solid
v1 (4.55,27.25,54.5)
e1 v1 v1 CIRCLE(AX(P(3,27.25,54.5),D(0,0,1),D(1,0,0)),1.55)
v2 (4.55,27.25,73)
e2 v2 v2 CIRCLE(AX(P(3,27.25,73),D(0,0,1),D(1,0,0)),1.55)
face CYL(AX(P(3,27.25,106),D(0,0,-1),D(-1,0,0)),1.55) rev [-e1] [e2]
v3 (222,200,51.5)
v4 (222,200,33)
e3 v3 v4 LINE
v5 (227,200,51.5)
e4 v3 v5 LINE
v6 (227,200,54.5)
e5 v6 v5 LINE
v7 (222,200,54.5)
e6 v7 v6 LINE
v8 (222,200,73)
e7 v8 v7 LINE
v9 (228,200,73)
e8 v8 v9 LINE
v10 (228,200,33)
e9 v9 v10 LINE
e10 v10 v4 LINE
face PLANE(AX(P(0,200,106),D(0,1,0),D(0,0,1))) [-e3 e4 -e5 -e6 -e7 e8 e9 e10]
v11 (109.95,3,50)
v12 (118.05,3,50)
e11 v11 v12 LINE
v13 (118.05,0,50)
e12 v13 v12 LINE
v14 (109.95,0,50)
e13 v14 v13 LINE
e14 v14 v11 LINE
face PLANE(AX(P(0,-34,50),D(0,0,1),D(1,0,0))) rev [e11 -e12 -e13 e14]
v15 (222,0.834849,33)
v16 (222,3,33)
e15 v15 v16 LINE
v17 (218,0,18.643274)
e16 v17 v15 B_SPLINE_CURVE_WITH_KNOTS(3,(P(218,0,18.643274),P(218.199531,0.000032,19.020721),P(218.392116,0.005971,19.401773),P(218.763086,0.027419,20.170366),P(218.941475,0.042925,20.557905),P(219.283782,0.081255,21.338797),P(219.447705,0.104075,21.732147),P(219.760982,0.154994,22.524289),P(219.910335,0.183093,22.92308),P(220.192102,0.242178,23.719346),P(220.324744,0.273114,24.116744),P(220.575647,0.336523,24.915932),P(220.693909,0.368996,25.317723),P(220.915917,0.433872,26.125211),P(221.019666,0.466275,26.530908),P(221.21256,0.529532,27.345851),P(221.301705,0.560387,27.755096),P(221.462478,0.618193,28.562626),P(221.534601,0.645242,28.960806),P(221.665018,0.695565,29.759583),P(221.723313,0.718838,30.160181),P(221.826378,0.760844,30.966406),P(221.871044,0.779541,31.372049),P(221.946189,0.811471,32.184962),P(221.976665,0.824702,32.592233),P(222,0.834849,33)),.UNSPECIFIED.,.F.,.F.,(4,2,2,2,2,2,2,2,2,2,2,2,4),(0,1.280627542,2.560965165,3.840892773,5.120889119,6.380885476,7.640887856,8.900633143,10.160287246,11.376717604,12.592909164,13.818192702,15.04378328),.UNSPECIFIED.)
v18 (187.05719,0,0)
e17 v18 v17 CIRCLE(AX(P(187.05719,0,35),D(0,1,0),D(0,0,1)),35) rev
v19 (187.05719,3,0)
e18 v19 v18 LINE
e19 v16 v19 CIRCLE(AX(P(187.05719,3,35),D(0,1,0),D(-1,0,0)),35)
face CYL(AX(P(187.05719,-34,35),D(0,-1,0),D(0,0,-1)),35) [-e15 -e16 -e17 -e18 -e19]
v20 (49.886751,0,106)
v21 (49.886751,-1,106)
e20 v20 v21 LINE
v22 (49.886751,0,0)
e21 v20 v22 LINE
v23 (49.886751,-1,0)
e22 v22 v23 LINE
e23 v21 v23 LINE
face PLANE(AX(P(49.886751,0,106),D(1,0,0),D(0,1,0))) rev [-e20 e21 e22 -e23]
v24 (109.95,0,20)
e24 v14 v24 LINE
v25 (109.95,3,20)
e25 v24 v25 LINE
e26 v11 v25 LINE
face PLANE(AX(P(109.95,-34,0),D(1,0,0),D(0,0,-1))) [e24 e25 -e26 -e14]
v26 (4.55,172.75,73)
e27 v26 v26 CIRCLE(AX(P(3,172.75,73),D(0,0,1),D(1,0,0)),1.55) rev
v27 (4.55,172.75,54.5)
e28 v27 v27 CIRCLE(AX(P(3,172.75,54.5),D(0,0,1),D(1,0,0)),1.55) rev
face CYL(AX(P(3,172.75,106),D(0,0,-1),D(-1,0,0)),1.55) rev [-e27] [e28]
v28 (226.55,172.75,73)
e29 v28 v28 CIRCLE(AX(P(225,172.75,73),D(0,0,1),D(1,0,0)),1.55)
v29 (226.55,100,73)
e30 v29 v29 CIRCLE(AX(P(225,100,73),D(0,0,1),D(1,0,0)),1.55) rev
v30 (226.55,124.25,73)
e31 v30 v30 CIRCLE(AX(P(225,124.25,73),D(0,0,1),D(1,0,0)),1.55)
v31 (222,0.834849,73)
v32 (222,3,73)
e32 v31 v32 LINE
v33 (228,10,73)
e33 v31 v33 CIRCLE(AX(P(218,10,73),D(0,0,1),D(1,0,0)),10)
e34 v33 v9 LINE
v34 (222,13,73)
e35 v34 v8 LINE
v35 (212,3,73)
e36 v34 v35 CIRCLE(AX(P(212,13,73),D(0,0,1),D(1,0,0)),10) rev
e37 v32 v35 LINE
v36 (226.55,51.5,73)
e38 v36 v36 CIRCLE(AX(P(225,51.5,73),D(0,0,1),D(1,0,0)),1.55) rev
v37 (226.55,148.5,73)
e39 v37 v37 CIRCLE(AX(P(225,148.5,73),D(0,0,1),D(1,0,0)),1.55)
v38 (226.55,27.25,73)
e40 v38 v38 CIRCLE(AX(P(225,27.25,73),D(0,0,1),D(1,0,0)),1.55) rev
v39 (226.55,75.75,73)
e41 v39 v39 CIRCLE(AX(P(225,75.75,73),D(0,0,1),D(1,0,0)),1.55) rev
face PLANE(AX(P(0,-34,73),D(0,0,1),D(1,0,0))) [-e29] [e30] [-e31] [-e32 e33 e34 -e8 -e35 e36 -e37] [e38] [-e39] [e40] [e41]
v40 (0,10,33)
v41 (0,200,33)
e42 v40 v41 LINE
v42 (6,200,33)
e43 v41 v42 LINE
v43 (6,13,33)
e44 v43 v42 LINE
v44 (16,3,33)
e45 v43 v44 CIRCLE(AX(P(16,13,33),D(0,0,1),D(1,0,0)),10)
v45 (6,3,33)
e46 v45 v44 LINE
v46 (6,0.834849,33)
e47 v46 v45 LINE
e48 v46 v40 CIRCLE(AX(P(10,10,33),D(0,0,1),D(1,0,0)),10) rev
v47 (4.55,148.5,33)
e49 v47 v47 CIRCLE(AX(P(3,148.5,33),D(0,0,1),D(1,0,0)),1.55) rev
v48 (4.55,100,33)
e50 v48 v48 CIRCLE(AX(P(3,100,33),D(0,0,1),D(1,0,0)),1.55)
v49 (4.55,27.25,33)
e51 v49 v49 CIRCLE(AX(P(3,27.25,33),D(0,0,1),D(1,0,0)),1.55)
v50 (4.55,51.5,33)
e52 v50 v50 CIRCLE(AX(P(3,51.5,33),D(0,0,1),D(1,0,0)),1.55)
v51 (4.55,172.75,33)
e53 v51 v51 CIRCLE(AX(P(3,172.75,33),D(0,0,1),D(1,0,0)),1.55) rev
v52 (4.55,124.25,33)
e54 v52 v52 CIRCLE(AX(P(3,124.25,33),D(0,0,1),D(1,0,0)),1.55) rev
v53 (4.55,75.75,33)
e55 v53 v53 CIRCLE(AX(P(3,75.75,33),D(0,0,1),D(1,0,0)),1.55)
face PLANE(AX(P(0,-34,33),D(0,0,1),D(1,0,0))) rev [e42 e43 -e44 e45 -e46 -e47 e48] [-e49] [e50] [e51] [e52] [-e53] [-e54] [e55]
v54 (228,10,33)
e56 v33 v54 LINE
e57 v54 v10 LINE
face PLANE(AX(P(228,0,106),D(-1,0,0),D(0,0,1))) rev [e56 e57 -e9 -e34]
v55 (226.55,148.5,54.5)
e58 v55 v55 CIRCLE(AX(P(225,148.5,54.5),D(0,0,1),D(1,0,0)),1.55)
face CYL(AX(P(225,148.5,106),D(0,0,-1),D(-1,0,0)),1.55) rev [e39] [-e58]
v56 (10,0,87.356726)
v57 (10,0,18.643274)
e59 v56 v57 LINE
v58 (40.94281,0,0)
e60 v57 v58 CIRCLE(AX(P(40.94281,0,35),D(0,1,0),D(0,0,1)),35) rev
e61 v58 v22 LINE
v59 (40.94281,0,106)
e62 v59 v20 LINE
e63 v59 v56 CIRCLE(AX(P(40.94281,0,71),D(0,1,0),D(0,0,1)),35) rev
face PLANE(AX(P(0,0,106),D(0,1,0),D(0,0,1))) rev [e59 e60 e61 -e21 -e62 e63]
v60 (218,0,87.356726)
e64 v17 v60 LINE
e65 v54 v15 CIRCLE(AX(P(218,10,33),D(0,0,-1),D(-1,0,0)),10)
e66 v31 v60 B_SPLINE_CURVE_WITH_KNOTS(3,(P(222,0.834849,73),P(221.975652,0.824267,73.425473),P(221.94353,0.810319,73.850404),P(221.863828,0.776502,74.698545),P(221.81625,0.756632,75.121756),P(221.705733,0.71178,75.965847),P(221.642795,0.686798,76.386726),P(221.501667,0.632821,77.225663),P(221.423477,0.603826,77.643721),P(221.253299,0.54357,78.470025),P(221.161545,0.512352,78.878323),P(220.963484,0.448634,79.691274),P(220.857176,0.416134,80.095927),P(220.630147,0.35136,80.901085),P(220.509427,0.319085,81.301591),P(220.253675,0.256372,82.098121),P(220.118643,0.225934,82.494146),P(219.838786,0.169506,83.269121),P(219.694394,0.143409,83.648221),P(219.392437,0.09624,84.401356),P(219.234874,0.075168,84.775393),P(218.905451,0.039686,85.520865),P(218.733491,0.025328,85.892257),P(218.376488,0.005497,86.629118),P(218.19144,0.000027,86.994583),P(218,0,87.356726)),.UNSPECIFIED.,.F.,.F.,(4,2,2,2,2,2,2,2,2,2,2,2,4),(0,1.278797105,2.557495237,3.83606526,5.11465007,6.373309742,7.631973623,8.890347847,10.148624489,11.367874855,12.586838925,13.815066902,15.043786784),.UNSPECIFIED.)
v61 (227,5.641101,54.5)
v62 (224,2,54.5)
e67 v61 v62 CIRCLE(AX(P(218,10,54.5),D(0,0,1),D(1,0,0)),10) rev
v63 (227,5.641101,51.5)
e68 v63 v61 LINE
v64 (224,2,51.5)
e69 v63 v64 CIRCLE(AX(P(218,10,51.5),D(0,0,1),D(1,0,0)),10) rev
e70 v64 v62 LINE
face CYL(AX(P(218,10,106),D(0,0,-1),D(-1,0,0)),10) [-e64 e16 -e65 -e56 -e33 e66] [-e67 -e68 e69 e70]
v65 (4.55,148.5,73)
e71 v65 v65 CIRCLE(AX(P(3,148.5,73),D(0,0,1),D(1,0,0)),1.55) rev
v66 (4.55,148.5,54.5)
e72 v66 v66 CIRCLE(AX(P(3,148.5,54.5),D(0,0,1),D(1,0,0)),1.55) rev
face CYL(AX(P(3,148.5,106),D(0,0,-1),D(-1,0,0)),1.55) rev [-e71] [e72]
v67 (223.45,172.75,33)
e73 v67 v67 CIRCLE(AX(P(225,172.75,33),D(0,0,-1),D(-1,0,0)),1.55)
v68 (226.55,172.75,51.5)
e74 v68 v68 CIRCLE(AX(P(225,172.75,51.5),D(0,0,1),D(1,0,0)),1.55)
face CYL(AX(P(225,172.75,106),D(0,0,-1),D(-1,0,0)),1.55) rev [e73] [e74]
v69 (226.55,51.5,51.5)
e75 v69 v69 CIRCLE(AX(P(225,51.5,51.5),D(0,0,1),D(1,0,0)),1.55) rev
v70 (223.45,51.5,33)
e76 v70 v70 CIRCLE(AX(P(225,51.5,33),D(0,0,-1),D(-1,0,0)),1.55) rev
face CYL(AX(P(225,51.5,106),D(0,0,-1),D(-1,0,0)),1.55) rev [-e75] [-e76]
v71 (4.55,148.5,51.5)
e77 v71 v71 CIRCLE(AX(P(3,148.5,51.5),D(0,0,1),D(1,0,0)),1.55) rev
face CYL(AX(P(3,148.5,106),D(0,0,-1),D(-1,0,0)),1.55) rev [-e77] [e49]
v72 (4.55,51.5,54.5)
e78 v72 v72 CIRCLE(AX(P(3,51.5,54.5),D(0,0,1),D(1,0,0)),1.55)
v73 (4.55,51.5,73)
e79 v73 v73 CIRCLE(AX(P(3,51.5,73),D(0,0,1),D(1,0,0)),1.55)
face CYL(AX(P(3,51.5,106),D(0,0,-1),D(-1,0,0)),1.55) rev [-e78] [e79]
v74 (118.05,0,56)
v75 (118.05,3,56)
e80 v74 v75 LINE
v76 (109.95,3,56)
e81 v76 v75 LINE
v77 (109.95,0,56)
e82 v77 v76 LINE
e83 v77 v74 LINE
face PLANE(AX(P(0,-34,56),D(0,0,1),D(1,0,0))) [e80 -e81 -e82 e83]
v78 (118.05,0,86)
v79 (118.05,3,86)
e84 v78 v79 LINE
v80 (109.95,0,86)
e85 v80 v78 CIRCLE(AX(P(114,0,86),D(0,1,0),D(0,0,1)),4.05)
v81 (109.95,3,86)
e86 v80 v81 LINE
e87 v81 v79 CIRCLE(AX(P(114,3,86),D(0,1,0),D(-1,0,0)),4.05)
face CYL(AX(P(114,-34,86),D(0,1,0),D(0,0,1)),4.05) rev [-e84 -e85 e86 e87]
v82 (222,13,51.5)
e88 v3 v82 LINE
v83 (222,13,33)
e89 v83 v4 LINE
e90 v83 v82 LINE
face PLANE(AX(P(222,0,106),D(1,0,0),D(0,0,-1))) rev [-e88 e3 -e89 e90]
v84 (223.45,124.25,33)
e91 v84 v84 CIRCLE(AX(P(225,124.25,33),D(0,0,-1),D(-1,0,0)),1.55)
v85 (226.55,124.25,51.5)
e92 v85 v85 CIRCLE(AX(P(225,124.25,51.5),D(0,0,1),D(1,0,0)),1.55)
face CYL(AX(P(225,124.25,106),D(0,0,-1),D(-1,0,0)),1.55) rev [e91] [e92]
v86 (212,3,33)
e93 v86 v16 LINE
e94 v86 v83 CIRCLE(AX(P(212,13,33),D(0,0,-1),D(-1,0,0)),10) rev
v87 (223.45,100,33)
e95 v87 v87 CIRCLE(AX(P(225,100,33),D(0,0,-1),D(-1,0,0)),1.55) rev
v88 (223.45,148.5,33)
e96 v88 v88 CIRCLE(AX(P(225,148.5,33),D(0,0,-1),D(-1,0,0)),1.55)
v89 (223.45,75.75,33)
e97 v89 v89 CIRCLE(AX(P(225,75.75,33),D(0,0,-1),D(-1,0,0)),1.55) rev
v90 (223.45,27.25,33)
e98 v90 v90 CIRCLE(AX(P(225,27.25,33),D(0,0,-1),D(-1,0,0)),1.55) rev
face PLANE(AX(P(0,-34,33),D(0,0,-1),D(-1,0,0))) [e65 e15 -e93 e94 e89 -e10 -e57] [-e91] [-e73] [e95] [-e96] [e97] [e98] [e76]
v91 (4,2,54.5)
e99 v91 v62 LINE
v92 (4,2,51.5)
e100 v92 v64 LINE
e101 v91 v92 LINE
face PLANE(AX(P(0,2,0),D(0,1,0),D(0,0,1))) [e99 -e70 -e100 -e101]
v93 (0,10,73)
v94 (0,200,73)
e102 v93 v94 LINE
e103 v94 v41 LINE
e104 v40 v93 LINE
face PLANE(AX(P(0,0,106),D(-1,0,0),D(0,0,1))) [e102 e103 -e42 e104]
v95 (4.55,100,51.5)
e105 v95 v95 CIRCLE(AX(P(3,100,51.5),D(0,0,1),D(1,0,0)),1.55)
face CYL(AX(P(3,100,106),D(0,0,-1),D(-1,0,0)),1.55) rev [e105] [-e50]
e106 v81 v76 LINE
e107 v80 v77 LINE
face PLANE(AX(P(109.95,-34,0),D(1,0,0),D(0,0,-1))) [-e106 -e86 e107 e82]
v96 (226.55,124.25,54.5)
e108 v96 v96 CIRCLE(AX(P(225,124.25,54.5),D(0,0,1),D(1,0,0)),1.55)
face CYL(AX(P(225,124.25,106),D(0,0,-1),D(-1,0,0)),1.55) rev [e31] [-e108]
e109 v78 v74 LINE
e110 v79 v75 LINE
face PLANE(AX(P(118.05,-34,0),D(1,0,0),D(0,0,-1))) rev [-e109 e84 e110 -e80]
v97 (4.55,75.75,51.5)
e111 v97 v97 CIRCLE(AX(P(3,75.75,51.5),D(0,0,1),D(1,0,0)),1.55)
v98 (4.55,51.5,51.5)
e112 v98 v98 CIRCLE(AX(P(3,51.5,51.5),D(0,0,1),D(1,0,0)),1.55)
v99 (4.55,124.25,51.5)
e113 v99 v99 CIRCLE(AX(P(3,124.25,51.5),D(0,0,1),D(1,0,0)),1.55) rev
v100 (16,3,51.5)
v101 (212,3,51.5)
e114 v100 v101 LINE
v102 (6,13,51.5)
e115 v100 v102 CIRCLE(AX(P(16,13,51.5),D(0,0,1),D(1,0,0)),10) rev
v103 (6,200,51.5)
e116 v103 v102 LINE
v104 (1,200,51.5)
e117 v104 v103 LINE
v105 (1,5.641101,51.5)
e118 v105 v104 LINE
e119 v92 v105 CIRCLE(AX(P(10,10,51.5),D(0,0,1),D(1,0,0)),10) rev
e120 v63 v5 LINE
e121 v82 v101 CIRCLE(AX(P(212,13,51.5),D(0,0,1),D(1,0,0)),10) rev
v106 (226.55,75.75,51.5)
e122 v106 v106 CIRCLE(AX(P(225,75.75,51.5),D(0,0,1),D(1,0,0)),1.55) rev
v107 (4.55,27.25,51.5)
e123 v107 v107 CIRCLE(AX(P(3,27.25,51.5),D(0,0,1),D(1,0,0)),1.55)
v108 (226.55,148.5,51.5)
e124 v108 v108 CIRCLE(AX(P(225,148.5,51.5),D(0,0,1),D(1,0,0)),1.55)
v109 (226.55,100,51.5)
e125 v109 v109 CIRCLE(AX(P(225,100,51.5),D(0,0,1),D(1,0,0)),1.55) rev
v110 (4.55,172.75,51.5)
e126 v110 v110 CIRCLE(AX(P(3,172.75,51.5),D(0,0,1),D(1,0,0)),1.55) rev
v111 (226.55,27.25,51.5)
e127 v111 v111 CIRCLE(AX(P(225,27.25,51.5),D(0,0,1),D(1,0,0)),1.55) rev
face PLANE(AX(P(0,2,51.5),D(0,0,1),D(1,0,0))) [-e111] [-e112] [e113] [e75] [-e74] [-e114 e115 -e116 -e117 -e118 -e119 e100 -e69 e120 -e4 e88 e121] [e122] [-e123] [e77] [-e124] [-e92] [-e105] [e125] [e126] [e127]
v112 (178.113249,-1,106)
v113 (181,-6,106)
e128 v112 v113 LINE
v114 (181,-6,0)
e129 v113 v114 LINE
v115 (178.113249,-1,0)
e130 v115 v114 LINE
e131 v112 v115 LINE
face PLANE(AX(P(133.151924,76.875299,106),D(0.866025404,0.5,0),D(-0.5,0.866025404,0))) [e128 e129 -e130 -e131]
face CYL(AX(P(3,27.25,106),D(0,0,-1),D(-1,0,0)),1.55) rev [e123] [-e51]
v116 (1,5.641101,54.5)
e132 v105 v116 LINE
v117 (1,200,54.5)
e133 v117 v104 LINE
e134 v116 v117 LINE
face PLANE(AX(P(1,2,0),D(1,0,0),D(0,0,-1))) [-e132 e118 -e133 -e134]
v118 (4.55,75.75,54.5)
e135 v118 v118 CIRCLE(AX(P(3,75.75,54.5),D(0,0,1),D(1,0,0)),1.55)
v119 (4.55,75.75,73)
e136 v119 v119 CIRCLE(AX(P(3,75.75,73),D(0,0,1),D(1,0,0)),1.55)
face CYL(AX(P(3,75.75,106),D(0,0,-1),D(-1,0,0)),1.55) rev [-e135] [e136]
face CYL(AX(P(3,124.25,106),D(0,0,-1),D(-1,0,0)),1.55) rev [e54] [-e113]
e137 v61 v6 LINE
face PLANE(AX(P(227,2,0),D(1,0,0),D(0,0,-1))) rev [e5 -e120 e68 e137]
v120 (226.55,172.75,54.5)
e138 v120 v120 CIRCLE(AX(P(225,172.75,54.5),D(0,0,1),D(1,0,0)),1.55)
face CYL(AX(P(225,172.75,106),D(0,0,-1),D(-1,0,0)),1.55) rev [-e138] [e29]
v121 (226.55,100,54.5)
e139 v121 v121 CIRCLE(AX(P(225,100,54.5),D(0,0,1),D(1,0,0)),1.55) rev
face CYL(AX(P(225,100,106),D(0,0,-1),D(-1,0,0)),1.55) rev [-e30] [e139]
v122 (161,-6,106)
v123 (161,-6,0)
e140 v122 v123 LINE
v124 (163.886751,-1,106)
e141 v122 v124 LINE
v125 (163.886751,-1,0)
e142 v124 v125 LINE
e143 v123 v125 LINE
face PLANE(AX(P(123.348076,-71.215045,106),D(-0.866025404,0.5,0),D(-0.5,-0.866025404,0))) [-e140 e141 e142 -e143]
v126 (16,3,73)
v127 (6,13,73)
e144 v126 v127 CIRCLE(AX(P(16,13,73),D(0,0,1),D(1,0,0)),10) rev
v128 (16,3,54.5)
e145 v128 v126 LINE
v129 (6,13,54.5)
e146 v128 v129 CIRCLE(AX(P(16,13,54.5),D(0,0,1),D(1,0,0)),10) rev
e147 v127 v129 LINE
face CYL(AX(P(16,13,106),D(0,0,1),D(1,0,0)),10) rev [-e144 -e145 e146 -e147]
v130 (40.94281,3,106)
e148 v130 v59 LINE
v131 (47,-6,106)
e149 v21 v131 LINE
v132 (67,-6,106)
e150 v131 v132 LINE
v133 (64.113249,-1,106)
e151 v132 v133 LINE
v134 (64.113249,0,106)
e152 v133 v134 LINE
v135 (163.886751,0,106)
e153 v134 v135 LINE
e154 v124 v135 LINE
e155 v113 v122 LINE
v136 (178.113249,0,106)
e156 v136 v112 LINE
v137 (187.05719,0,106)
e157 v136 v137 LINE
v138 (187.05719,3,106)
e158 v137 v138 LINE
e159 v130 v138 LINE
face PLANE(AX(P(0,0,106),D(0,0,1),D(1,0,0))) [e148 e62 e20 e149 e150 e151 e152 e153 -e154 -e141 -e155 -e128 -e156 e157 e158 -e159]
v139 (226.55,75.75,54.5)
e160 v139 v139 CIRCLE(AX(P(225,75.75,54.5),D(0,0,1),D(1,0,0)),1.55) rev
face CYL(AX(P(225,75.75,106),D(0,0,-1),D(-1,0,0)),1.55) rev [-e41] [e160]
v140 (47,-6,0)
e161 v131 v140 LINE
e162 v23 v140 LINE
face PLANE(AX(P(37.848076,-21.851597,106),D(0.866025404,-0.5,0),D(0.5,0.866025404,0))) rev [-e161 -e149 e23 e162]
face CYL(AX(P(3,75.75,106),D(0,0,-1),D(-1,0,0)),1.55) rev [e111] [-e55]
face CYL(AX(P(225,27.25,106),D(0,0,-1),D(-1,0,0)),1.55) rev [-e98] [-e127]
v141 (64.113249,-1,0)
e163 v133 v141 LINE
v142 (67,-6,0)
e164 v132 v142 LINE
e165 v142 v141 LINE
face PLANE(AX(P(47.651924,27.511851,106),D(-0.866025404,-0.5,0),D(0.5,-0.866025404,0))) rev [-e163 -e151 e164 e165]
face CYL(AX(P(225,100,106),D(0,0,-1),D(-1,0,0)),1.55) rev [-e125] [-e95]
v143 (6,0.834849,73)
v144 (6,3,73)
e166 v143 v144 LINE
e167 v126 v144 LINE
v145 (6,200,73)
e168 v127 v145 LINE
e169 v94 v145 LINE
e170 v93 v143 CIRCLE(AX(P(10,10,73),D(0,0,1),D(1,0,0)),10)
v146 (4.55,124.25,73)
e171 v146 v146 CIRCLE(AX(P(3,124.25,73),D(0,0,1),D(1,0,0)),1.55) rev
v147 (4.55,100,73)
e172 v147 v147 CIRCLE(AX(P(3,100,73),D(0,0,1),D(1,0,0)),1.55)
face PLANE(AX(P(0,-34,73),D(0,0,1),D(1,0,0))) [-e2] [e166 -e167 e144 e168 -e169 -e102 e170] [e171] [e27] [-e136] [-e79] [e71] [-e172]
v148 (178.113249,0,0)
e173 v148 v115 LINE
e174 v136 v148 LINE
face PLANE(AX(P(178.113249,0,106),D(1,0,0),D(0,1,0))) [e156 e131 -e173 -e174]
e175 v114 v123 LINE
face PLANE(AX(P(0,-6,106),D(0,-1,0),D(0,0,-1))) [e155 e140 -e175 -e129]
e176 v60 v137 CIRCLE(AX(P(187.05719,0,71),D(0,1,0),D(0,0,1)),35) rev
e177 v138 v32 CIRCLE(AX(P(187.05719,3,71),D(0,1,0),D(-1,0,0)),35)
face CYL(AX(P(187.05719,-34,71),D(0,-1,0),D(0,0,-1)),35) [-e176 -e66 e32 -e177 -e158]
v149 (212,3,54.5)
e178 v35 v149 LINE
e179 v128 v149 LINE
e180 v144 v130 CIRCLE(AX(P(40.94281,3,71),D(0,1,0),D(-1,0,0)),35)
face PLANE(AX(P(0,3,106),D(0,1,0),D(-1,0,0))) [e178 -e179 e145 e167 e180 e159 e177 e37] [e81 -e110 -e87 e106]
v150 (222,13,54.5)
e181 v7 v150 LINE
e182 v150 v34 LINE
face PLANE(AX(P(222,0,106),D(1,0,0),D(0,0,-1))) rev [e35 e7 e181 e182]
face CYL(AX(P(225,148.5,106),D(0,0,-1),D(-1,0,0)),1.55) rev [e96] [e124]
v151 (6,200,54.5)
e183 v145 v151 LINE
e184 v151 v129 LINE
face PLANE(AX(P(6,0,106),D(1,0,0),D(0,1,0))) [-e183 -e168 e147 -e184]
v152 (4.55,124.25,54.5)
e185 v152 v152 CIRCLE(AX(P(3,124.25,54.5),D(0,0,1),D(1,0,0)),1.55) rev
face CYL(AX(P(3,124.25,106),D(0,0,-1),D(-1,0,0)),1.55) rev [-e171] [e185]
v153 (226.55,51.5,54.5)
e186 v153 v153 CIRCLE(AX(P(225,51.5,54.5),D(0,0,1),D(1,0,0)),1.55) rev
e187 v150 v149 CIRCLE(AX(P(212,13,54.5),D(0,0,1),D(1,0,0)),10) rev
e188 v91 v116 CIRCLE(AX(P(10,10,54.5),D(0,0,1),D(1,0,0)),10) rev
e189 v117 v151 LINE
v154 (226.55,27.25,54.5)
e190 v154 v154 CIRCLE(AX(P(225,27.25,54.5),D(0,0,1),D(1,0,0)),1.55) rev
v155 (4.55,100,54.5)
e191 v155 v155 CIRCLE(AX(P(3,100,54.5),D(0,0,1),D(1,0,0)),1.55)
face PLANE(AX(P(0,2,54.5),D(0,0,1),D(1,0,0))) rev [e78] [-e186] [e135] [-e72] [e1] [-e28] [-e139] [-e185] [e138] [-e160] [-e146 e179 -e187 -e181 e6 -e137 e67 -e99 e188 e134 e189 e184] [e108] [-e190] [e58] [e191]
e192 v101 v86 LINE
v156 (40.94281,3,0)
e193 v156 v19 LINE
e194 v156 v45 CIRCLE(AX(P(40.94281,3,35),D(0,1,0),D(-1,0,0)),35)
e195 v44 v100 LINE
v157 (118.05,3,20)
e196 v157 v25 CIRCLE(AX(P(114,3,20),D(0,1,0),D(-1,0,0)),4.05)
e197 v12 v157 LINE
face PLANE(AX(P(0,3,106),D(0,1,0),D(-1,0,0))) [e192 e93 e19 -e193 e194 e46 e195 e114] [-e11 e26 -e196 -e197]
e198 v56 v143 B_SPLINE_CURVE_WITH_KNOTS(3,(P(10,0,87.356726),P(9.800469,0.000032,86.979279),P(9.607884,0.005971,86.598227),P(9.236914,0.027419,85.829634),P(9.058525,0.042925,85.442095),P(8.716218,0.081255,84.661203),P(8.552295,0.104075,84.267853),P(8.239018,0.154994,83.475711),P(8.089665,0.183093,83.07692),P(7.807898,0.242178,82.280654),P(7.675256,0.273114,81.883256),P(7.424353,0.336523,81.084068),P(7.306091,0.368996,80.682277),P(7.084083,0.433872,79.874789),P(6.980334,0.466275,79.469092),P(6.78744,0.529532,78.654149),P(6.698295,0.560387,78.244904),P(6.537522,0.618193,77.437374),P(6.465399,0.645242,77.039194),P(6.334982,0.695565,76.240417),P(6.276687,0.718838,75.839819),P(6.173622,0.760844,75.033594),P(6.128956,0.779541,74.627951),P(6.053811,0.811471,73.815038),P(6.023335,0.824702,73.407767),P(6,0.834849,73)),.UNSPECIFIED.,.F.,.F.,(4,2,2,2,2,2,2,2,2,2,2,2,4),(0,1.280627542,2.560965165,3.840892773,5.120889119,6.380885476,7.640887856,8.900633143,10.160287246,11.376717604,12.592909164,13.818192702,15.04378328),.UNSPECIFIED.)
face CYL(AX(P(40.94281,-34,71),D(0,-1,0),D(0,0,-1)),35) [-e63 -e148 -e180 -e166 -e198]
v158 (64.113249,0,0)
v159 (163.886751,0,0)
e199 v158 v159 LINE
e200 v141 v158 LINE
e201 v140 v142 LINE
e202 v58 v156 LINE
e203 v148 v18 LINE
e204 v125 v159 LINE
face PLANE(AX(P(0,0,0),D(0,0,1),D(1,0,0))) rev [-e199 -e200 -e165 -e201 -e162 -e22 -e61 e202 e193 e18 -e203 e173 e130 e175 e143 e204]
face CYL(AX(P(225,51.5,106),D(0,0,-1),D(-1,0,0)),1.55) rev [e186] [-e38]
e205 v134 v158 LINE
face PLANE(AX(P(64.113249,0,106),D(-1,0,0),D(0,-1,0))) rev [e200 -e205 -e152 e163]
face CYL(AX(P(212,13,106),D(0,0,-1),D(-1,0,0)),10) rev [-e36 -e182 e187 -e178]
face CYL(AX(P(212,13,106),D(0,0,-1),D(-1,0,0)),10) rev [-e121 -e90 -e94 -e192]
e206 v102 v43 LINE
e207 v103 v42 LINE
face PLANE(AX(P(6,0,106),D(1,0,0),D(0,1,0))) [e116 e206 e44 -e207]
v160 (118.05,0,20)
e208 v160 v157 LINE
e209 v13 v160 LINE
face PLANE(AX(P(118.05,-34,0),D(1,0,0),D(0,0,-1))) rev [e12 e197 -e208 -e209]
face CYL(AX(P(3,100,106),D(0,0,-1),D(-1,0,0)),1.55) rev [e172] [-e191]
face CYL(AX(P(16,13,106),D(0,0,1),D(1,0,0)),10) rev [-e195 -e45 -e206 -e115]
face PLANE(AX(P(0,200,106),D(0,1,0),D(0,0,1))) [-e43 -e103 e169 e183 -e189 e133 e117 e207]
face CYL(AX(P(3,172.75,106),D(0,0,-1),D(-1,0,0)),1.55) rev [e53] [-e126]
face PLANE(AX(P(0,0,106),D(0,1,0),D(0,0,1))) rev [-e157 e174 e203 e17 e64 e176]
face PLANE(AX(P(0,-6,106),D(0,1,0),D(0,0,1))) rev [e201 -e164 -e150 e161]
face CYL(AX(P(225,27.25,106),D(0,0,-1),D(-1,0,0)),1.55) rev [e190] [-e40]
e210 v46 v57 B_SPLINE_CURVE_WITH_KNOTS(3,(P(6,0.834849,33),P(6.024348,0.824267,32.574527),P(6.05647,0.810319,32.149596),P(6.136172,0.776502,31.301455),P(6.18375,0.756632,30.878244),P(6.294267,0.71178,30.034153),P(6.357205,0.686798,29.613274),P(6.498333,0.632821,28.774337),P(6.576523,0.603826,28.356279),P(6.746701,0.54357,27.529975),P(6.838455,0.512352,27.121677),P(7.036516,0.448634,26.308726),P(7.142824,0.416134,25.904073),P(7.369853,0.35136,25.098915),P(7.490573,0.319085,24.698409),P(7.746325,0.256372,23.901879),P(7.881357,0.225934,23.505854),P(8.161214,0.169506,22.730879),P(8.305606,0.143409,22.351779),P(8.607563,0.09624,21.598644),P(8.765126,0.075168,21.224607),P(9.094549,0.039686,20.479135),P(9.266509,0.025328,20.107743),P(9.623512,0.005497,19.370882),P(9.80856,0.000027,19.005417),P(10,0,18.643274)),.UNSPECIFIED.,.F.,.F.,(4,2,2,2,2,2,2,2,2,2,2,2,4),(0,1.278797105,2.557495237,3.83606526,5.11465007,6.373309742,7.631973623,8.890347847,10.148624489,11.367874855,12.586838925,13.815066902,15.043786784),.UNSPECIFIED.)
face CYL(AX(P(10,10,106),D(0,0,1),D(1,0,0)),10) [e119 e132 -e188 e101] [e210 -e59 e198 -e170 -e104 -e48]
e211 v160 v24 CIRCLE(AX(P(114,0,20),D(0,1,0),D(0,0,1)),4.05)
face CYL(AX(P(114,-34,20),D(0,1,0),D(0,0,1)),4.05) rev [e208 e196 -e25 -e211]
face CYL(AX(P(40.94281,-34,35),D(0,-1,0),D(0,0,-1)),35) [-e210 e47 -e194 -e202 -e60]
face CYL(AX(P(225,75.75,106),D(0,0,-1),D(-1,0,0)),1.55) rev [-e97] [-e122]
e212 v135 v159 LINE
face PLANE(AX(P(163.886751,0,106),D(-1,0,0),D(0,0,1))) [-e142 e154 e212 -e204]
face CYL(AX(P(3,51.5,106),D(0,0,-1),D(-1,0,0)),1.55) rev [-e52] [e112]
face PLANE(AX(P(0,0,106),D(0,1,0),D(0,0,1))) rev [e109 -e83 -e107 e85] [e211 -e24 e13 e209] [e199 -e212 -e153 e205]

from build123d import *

# Parameters (mm, degrees)
SKETCH1_W           = 6
SKETCH1_H           = 197
SKETCH1_R           = 1.55
SKETCH1_H_2         = 3
BOSS_EXTRUDE1_DEPTH = 106
SKETCH2_W           = 6
SKETCH2_H           = 33
CUT_EXTRUDE1_DEPTH  = 234
FILLET2_R           = 10
SKETCH2_5_W         = 5
SKETCH2_5_H         = 3
SKETCH2_5_W_2       = 103.95
SKETCH2_5_W_3       = 8.1
CUT_EXTRUDE2_DEPTH  = 198
FILLET1_R           = 35


with BuildPart() as part:
    # Sketch1 → Boss-Extrude1 (new body)
    # profile 1 of 7: a face of its own
    with BuildSketch(Plane.XY):
        with Locations((225, 101.5)):
            Rectangle(SKETCH1_W, SKETCH1_H)
        with Locations((225, 27.25)):
            Circle(SKETCH1_R, mode=Mode.SUBTRACT)
        with Locations((225, 51.5)):
            Circle(SKETCH1_R, mode=Mode.SUBTRACT)
        with Locations((225, 75.75)):
            Circle(SKETCH1_R, mode=Mode.SUBTRACT)
        with Locations((225, 100)):
            Circle(SKETCH1_R, mode=Mode.SUBTRACT)
        with Locations((225, 124.25)):
            Circle(SKETCH1_R, mode=Mode.SUBTRACT)
        with Locations((225, 148.5)):
            Circle(SKETCH1_R, mode=Mode.SUBTRACT)
        with Locations((225, 172.75)):
            Circle(SKETCH1_R, mode=Mode.SUBTRACT)
    # profile 2 of 7: a face of its own
    with BuildSketch(Plane.XY):
        Polygon((178.113248654, -1), (178.113248654, 0), (163.886751346, 0), (163.886751346, -1), (161, -6), (181, -6), align=None)
    # profile 3 of 7: a face of its own
    with BuildSketch(Plane.XY):
        Polygon((64.113248654, 0), (49.886751346, 0), (49.886751346, -1), (47, -6), (67, -6), (64.113248654, -1), align=None)
    # profile 4 of 7: a face of its own
    with BuildSketch(Plane.XY):
        Polygon((222, 3), (6, 3), (6, 0), (49.886751346, 0), (64.113248654, 0), (163.886751346, 0), (178.113248654, 0), (222, 0), align=None)
    # profile 5 of 7: a face of its own
    with BuildSketch(Plane.XY):
        with Locations((225, 1.5)):
            Rectangle(SKETCH1_W, SKETCH1_H_2)
    # profile 6 of 7: a face of its own
    with BuildSketch(Plane.XY):
        with Locations((3, 1.5)):
            Rectangle(SKETCH1_W, SKETCH1_H_2)
    # profile 7 of 7: a face of its own
    with BuildSketch(Plane.XY):
        with Locations((3, 101.5)):
            Rectangle(SKETCH1_W, SKETCH1_H)
        with Locations((3, 27.25)):
            Circle(SKETCH1_R, mode=Mode.SUBTRACT)
        with Locations((3, 51.5)):
            Circle(SKETCH1_R, mode=Mode.SUBTRACT)
        with Locations((3, 75.75)):
            Circle(SKETCH1_R, mode=Mode.SUBTRACT)
        with Locations((3, 100)):
            Circle(SKETCH1_R, mode=Mode.SUBTRACT)
        with Locations((3, 124.25)):
            Circle(SKETCH1_R, mode=Mode.SUBTRACT)
        with Locations((3, 148.5)):
            Circle(SKETCH1_R, mode=Mode.SUBTRACT)
        with Locations((3, 172.75)):
            Circle(SKETCH1_R, mode=Mode.SUBTRACT)
    extrude(amount=BOSS_EXTRUDE1_DEPTH)

    # Sketch2 → Cut-Extrude1 (cut)
    with BuildSketch(Plane(origin=(0, 200, 0), x_dir=(1, 0, 0), z_dir=(0, 1, 0))):
        with BuildLine():
            Line((109.95, -20), (109.95, -50))
            Line((109.95, -50), (118.05, -50))
            Line((118.05, -50), (118.05, -20))
            ThreePointArc((118.05, -20), (114, -15.95), (109.95, -20))
        make_face()
        with BuildLine():
            Line((118.05, -56), (109.95, -56))
            Line((109.95, -56), (109.95, -86))
            ThreePointArc((109.95, -86), (114, -90.05), (118.05, -86))
            Line((118.05, -86), (118.05, -56))
        make_face()
        with Locations((225, -89.5)):
            Rectangle(SKETCH2_W, SKETCH2_H)
        with Locations((225, -16.5)):
            Rectangle(SKETCH2_W, SKETCH2_H)
        with Locations((3, -16.5)):
            Rectangle(SKETCH2_W, SKETCH2_H)
        with Locations((3, -89.5)):
            Rectangle(SKETCH2_W, SKETCH2_H)
    extrude(amount=-CUT_EXTRUDE1_DEPTH, mode=Mode.SUBTRACT)

    # Fillet2
    fillet2_edges = [part.edges().sort_by_distance(p)[0] for p in [
        (228, 0, 53),
        (222, 3, 53),
        (0, 0, 53),
        (6, 3, 53),
    ]]
    fillet(fillet2_edges, radius=FILLET2_R)

    # Sketch2<5> → Cut-Extrude2 (cut)
    with BuildSketch(Plane(origin=(0, 200, 0), x_dir=(1, 0, 0), z_dir=(0, 1, 0))):
        with Locations((224.5, -53)):
            Rectangle(SKETCH2_5_W, SKETCH2_5_H)
        with Locations((170.025, -53)):
            Rectangle(SKETCH2_5_W_2, SKETCH2_5_H)
        with Locations((57.975, -53)):
            Rectangle(SKETCH2_5_W_2, SKETCH2_5_H)
        with Locations((114, -53)):
            Rectangle(SKETCH2_5_W_3, SKETCH2_5_H)
        with Locations((3.5, -53)):
            Rectangle(SKETCH2_5_W, SKETCH2_5_H)
    extrude(amount=-CUT_EXTRUDE2_DEPTH, mode=Mode.SUBTRACT)

    # Fillet1
    # the kernel refuses this fillet: 35 mm, written as the material it takes off along each edge
    with BuildSketch(Plane(origin=(222, 90.357026048, 0), x_dir=(0, 0, 1), z_dir=(0, -1, 0))) as fillet1_piece_1:
        with BuildLine():
            CenterArc((35, 34.942810419), FILLET1_R, 180, 86.72417104)
            Line((0, 34.942810419), (-0.7, 34.942810419))
            Line((-0.7, 34.942810419), (-0.7, 0))
            Line((-0.7, 0), (0, -0.7))
            ThreePointArc((0, -0.7), (16.5, -0.7), (32.96, -0.698856208))
            Line((32.96, -0.698856208), (33, 0))
        make_face()
    extrude(amount=176.879203486, mode=Mode.SUBTRACT)
    with BuildSketch(Plane(origin=(6, 90.357026048, 0), x_dir=(1, 0, 0), z_dir=(0, -1, 0)), Plane(origin=(222, 90.357026048, 106), x_dir=(-1, 0, 0), z_dir=(0, -1, 0))) as fillet1_piece_2:
        with BuildLine():
            CenterArc((34.942810419, 35), FILLET1_R, 183.27582896, 86.72417104)
            Line((0, 33), (-0.698856208, 32.96))
            ThreePointArc((-0.698856208, 32.96), (-0.7, 16.5), (-0.7, 0))
            Line((-0.7, 0), (0, -0.7))
            Line((0, -0.7), (34.942810419, -0.7))
            Line((34.942810419, -0.7), (34.942810419, 0))
        make_face()
    extrude(amount=176.879203486, mode=Mode.SUBTRACT)
    with BuildSketch(Plane(origin=(6, 90.357026048, 106), x_dir=(1, 0, 0), z_dir=(0, -1, 0))) as fillet1_piece_3:
        with BuildLine():
            CenterArc((34.942810419, -35), FILLET1_R, 90, 86.72417104)
            Line((0, -33), (-0.698856208, -32.96))
            ThreePointArc((-0.698856208, -32.96), (-0.7, -16.5), (-0.7, 0))
            Line((-0.7, 0), (0, 0.7))
            Line((0, 0.7), (34.942810419, 0.7))
            Line((34.942810419, 0.7), (34.942810419, 0))
        make_face()
    extrude(amount=176.879203486, mode=Mode.SUBTRACT)


solid = part.part
